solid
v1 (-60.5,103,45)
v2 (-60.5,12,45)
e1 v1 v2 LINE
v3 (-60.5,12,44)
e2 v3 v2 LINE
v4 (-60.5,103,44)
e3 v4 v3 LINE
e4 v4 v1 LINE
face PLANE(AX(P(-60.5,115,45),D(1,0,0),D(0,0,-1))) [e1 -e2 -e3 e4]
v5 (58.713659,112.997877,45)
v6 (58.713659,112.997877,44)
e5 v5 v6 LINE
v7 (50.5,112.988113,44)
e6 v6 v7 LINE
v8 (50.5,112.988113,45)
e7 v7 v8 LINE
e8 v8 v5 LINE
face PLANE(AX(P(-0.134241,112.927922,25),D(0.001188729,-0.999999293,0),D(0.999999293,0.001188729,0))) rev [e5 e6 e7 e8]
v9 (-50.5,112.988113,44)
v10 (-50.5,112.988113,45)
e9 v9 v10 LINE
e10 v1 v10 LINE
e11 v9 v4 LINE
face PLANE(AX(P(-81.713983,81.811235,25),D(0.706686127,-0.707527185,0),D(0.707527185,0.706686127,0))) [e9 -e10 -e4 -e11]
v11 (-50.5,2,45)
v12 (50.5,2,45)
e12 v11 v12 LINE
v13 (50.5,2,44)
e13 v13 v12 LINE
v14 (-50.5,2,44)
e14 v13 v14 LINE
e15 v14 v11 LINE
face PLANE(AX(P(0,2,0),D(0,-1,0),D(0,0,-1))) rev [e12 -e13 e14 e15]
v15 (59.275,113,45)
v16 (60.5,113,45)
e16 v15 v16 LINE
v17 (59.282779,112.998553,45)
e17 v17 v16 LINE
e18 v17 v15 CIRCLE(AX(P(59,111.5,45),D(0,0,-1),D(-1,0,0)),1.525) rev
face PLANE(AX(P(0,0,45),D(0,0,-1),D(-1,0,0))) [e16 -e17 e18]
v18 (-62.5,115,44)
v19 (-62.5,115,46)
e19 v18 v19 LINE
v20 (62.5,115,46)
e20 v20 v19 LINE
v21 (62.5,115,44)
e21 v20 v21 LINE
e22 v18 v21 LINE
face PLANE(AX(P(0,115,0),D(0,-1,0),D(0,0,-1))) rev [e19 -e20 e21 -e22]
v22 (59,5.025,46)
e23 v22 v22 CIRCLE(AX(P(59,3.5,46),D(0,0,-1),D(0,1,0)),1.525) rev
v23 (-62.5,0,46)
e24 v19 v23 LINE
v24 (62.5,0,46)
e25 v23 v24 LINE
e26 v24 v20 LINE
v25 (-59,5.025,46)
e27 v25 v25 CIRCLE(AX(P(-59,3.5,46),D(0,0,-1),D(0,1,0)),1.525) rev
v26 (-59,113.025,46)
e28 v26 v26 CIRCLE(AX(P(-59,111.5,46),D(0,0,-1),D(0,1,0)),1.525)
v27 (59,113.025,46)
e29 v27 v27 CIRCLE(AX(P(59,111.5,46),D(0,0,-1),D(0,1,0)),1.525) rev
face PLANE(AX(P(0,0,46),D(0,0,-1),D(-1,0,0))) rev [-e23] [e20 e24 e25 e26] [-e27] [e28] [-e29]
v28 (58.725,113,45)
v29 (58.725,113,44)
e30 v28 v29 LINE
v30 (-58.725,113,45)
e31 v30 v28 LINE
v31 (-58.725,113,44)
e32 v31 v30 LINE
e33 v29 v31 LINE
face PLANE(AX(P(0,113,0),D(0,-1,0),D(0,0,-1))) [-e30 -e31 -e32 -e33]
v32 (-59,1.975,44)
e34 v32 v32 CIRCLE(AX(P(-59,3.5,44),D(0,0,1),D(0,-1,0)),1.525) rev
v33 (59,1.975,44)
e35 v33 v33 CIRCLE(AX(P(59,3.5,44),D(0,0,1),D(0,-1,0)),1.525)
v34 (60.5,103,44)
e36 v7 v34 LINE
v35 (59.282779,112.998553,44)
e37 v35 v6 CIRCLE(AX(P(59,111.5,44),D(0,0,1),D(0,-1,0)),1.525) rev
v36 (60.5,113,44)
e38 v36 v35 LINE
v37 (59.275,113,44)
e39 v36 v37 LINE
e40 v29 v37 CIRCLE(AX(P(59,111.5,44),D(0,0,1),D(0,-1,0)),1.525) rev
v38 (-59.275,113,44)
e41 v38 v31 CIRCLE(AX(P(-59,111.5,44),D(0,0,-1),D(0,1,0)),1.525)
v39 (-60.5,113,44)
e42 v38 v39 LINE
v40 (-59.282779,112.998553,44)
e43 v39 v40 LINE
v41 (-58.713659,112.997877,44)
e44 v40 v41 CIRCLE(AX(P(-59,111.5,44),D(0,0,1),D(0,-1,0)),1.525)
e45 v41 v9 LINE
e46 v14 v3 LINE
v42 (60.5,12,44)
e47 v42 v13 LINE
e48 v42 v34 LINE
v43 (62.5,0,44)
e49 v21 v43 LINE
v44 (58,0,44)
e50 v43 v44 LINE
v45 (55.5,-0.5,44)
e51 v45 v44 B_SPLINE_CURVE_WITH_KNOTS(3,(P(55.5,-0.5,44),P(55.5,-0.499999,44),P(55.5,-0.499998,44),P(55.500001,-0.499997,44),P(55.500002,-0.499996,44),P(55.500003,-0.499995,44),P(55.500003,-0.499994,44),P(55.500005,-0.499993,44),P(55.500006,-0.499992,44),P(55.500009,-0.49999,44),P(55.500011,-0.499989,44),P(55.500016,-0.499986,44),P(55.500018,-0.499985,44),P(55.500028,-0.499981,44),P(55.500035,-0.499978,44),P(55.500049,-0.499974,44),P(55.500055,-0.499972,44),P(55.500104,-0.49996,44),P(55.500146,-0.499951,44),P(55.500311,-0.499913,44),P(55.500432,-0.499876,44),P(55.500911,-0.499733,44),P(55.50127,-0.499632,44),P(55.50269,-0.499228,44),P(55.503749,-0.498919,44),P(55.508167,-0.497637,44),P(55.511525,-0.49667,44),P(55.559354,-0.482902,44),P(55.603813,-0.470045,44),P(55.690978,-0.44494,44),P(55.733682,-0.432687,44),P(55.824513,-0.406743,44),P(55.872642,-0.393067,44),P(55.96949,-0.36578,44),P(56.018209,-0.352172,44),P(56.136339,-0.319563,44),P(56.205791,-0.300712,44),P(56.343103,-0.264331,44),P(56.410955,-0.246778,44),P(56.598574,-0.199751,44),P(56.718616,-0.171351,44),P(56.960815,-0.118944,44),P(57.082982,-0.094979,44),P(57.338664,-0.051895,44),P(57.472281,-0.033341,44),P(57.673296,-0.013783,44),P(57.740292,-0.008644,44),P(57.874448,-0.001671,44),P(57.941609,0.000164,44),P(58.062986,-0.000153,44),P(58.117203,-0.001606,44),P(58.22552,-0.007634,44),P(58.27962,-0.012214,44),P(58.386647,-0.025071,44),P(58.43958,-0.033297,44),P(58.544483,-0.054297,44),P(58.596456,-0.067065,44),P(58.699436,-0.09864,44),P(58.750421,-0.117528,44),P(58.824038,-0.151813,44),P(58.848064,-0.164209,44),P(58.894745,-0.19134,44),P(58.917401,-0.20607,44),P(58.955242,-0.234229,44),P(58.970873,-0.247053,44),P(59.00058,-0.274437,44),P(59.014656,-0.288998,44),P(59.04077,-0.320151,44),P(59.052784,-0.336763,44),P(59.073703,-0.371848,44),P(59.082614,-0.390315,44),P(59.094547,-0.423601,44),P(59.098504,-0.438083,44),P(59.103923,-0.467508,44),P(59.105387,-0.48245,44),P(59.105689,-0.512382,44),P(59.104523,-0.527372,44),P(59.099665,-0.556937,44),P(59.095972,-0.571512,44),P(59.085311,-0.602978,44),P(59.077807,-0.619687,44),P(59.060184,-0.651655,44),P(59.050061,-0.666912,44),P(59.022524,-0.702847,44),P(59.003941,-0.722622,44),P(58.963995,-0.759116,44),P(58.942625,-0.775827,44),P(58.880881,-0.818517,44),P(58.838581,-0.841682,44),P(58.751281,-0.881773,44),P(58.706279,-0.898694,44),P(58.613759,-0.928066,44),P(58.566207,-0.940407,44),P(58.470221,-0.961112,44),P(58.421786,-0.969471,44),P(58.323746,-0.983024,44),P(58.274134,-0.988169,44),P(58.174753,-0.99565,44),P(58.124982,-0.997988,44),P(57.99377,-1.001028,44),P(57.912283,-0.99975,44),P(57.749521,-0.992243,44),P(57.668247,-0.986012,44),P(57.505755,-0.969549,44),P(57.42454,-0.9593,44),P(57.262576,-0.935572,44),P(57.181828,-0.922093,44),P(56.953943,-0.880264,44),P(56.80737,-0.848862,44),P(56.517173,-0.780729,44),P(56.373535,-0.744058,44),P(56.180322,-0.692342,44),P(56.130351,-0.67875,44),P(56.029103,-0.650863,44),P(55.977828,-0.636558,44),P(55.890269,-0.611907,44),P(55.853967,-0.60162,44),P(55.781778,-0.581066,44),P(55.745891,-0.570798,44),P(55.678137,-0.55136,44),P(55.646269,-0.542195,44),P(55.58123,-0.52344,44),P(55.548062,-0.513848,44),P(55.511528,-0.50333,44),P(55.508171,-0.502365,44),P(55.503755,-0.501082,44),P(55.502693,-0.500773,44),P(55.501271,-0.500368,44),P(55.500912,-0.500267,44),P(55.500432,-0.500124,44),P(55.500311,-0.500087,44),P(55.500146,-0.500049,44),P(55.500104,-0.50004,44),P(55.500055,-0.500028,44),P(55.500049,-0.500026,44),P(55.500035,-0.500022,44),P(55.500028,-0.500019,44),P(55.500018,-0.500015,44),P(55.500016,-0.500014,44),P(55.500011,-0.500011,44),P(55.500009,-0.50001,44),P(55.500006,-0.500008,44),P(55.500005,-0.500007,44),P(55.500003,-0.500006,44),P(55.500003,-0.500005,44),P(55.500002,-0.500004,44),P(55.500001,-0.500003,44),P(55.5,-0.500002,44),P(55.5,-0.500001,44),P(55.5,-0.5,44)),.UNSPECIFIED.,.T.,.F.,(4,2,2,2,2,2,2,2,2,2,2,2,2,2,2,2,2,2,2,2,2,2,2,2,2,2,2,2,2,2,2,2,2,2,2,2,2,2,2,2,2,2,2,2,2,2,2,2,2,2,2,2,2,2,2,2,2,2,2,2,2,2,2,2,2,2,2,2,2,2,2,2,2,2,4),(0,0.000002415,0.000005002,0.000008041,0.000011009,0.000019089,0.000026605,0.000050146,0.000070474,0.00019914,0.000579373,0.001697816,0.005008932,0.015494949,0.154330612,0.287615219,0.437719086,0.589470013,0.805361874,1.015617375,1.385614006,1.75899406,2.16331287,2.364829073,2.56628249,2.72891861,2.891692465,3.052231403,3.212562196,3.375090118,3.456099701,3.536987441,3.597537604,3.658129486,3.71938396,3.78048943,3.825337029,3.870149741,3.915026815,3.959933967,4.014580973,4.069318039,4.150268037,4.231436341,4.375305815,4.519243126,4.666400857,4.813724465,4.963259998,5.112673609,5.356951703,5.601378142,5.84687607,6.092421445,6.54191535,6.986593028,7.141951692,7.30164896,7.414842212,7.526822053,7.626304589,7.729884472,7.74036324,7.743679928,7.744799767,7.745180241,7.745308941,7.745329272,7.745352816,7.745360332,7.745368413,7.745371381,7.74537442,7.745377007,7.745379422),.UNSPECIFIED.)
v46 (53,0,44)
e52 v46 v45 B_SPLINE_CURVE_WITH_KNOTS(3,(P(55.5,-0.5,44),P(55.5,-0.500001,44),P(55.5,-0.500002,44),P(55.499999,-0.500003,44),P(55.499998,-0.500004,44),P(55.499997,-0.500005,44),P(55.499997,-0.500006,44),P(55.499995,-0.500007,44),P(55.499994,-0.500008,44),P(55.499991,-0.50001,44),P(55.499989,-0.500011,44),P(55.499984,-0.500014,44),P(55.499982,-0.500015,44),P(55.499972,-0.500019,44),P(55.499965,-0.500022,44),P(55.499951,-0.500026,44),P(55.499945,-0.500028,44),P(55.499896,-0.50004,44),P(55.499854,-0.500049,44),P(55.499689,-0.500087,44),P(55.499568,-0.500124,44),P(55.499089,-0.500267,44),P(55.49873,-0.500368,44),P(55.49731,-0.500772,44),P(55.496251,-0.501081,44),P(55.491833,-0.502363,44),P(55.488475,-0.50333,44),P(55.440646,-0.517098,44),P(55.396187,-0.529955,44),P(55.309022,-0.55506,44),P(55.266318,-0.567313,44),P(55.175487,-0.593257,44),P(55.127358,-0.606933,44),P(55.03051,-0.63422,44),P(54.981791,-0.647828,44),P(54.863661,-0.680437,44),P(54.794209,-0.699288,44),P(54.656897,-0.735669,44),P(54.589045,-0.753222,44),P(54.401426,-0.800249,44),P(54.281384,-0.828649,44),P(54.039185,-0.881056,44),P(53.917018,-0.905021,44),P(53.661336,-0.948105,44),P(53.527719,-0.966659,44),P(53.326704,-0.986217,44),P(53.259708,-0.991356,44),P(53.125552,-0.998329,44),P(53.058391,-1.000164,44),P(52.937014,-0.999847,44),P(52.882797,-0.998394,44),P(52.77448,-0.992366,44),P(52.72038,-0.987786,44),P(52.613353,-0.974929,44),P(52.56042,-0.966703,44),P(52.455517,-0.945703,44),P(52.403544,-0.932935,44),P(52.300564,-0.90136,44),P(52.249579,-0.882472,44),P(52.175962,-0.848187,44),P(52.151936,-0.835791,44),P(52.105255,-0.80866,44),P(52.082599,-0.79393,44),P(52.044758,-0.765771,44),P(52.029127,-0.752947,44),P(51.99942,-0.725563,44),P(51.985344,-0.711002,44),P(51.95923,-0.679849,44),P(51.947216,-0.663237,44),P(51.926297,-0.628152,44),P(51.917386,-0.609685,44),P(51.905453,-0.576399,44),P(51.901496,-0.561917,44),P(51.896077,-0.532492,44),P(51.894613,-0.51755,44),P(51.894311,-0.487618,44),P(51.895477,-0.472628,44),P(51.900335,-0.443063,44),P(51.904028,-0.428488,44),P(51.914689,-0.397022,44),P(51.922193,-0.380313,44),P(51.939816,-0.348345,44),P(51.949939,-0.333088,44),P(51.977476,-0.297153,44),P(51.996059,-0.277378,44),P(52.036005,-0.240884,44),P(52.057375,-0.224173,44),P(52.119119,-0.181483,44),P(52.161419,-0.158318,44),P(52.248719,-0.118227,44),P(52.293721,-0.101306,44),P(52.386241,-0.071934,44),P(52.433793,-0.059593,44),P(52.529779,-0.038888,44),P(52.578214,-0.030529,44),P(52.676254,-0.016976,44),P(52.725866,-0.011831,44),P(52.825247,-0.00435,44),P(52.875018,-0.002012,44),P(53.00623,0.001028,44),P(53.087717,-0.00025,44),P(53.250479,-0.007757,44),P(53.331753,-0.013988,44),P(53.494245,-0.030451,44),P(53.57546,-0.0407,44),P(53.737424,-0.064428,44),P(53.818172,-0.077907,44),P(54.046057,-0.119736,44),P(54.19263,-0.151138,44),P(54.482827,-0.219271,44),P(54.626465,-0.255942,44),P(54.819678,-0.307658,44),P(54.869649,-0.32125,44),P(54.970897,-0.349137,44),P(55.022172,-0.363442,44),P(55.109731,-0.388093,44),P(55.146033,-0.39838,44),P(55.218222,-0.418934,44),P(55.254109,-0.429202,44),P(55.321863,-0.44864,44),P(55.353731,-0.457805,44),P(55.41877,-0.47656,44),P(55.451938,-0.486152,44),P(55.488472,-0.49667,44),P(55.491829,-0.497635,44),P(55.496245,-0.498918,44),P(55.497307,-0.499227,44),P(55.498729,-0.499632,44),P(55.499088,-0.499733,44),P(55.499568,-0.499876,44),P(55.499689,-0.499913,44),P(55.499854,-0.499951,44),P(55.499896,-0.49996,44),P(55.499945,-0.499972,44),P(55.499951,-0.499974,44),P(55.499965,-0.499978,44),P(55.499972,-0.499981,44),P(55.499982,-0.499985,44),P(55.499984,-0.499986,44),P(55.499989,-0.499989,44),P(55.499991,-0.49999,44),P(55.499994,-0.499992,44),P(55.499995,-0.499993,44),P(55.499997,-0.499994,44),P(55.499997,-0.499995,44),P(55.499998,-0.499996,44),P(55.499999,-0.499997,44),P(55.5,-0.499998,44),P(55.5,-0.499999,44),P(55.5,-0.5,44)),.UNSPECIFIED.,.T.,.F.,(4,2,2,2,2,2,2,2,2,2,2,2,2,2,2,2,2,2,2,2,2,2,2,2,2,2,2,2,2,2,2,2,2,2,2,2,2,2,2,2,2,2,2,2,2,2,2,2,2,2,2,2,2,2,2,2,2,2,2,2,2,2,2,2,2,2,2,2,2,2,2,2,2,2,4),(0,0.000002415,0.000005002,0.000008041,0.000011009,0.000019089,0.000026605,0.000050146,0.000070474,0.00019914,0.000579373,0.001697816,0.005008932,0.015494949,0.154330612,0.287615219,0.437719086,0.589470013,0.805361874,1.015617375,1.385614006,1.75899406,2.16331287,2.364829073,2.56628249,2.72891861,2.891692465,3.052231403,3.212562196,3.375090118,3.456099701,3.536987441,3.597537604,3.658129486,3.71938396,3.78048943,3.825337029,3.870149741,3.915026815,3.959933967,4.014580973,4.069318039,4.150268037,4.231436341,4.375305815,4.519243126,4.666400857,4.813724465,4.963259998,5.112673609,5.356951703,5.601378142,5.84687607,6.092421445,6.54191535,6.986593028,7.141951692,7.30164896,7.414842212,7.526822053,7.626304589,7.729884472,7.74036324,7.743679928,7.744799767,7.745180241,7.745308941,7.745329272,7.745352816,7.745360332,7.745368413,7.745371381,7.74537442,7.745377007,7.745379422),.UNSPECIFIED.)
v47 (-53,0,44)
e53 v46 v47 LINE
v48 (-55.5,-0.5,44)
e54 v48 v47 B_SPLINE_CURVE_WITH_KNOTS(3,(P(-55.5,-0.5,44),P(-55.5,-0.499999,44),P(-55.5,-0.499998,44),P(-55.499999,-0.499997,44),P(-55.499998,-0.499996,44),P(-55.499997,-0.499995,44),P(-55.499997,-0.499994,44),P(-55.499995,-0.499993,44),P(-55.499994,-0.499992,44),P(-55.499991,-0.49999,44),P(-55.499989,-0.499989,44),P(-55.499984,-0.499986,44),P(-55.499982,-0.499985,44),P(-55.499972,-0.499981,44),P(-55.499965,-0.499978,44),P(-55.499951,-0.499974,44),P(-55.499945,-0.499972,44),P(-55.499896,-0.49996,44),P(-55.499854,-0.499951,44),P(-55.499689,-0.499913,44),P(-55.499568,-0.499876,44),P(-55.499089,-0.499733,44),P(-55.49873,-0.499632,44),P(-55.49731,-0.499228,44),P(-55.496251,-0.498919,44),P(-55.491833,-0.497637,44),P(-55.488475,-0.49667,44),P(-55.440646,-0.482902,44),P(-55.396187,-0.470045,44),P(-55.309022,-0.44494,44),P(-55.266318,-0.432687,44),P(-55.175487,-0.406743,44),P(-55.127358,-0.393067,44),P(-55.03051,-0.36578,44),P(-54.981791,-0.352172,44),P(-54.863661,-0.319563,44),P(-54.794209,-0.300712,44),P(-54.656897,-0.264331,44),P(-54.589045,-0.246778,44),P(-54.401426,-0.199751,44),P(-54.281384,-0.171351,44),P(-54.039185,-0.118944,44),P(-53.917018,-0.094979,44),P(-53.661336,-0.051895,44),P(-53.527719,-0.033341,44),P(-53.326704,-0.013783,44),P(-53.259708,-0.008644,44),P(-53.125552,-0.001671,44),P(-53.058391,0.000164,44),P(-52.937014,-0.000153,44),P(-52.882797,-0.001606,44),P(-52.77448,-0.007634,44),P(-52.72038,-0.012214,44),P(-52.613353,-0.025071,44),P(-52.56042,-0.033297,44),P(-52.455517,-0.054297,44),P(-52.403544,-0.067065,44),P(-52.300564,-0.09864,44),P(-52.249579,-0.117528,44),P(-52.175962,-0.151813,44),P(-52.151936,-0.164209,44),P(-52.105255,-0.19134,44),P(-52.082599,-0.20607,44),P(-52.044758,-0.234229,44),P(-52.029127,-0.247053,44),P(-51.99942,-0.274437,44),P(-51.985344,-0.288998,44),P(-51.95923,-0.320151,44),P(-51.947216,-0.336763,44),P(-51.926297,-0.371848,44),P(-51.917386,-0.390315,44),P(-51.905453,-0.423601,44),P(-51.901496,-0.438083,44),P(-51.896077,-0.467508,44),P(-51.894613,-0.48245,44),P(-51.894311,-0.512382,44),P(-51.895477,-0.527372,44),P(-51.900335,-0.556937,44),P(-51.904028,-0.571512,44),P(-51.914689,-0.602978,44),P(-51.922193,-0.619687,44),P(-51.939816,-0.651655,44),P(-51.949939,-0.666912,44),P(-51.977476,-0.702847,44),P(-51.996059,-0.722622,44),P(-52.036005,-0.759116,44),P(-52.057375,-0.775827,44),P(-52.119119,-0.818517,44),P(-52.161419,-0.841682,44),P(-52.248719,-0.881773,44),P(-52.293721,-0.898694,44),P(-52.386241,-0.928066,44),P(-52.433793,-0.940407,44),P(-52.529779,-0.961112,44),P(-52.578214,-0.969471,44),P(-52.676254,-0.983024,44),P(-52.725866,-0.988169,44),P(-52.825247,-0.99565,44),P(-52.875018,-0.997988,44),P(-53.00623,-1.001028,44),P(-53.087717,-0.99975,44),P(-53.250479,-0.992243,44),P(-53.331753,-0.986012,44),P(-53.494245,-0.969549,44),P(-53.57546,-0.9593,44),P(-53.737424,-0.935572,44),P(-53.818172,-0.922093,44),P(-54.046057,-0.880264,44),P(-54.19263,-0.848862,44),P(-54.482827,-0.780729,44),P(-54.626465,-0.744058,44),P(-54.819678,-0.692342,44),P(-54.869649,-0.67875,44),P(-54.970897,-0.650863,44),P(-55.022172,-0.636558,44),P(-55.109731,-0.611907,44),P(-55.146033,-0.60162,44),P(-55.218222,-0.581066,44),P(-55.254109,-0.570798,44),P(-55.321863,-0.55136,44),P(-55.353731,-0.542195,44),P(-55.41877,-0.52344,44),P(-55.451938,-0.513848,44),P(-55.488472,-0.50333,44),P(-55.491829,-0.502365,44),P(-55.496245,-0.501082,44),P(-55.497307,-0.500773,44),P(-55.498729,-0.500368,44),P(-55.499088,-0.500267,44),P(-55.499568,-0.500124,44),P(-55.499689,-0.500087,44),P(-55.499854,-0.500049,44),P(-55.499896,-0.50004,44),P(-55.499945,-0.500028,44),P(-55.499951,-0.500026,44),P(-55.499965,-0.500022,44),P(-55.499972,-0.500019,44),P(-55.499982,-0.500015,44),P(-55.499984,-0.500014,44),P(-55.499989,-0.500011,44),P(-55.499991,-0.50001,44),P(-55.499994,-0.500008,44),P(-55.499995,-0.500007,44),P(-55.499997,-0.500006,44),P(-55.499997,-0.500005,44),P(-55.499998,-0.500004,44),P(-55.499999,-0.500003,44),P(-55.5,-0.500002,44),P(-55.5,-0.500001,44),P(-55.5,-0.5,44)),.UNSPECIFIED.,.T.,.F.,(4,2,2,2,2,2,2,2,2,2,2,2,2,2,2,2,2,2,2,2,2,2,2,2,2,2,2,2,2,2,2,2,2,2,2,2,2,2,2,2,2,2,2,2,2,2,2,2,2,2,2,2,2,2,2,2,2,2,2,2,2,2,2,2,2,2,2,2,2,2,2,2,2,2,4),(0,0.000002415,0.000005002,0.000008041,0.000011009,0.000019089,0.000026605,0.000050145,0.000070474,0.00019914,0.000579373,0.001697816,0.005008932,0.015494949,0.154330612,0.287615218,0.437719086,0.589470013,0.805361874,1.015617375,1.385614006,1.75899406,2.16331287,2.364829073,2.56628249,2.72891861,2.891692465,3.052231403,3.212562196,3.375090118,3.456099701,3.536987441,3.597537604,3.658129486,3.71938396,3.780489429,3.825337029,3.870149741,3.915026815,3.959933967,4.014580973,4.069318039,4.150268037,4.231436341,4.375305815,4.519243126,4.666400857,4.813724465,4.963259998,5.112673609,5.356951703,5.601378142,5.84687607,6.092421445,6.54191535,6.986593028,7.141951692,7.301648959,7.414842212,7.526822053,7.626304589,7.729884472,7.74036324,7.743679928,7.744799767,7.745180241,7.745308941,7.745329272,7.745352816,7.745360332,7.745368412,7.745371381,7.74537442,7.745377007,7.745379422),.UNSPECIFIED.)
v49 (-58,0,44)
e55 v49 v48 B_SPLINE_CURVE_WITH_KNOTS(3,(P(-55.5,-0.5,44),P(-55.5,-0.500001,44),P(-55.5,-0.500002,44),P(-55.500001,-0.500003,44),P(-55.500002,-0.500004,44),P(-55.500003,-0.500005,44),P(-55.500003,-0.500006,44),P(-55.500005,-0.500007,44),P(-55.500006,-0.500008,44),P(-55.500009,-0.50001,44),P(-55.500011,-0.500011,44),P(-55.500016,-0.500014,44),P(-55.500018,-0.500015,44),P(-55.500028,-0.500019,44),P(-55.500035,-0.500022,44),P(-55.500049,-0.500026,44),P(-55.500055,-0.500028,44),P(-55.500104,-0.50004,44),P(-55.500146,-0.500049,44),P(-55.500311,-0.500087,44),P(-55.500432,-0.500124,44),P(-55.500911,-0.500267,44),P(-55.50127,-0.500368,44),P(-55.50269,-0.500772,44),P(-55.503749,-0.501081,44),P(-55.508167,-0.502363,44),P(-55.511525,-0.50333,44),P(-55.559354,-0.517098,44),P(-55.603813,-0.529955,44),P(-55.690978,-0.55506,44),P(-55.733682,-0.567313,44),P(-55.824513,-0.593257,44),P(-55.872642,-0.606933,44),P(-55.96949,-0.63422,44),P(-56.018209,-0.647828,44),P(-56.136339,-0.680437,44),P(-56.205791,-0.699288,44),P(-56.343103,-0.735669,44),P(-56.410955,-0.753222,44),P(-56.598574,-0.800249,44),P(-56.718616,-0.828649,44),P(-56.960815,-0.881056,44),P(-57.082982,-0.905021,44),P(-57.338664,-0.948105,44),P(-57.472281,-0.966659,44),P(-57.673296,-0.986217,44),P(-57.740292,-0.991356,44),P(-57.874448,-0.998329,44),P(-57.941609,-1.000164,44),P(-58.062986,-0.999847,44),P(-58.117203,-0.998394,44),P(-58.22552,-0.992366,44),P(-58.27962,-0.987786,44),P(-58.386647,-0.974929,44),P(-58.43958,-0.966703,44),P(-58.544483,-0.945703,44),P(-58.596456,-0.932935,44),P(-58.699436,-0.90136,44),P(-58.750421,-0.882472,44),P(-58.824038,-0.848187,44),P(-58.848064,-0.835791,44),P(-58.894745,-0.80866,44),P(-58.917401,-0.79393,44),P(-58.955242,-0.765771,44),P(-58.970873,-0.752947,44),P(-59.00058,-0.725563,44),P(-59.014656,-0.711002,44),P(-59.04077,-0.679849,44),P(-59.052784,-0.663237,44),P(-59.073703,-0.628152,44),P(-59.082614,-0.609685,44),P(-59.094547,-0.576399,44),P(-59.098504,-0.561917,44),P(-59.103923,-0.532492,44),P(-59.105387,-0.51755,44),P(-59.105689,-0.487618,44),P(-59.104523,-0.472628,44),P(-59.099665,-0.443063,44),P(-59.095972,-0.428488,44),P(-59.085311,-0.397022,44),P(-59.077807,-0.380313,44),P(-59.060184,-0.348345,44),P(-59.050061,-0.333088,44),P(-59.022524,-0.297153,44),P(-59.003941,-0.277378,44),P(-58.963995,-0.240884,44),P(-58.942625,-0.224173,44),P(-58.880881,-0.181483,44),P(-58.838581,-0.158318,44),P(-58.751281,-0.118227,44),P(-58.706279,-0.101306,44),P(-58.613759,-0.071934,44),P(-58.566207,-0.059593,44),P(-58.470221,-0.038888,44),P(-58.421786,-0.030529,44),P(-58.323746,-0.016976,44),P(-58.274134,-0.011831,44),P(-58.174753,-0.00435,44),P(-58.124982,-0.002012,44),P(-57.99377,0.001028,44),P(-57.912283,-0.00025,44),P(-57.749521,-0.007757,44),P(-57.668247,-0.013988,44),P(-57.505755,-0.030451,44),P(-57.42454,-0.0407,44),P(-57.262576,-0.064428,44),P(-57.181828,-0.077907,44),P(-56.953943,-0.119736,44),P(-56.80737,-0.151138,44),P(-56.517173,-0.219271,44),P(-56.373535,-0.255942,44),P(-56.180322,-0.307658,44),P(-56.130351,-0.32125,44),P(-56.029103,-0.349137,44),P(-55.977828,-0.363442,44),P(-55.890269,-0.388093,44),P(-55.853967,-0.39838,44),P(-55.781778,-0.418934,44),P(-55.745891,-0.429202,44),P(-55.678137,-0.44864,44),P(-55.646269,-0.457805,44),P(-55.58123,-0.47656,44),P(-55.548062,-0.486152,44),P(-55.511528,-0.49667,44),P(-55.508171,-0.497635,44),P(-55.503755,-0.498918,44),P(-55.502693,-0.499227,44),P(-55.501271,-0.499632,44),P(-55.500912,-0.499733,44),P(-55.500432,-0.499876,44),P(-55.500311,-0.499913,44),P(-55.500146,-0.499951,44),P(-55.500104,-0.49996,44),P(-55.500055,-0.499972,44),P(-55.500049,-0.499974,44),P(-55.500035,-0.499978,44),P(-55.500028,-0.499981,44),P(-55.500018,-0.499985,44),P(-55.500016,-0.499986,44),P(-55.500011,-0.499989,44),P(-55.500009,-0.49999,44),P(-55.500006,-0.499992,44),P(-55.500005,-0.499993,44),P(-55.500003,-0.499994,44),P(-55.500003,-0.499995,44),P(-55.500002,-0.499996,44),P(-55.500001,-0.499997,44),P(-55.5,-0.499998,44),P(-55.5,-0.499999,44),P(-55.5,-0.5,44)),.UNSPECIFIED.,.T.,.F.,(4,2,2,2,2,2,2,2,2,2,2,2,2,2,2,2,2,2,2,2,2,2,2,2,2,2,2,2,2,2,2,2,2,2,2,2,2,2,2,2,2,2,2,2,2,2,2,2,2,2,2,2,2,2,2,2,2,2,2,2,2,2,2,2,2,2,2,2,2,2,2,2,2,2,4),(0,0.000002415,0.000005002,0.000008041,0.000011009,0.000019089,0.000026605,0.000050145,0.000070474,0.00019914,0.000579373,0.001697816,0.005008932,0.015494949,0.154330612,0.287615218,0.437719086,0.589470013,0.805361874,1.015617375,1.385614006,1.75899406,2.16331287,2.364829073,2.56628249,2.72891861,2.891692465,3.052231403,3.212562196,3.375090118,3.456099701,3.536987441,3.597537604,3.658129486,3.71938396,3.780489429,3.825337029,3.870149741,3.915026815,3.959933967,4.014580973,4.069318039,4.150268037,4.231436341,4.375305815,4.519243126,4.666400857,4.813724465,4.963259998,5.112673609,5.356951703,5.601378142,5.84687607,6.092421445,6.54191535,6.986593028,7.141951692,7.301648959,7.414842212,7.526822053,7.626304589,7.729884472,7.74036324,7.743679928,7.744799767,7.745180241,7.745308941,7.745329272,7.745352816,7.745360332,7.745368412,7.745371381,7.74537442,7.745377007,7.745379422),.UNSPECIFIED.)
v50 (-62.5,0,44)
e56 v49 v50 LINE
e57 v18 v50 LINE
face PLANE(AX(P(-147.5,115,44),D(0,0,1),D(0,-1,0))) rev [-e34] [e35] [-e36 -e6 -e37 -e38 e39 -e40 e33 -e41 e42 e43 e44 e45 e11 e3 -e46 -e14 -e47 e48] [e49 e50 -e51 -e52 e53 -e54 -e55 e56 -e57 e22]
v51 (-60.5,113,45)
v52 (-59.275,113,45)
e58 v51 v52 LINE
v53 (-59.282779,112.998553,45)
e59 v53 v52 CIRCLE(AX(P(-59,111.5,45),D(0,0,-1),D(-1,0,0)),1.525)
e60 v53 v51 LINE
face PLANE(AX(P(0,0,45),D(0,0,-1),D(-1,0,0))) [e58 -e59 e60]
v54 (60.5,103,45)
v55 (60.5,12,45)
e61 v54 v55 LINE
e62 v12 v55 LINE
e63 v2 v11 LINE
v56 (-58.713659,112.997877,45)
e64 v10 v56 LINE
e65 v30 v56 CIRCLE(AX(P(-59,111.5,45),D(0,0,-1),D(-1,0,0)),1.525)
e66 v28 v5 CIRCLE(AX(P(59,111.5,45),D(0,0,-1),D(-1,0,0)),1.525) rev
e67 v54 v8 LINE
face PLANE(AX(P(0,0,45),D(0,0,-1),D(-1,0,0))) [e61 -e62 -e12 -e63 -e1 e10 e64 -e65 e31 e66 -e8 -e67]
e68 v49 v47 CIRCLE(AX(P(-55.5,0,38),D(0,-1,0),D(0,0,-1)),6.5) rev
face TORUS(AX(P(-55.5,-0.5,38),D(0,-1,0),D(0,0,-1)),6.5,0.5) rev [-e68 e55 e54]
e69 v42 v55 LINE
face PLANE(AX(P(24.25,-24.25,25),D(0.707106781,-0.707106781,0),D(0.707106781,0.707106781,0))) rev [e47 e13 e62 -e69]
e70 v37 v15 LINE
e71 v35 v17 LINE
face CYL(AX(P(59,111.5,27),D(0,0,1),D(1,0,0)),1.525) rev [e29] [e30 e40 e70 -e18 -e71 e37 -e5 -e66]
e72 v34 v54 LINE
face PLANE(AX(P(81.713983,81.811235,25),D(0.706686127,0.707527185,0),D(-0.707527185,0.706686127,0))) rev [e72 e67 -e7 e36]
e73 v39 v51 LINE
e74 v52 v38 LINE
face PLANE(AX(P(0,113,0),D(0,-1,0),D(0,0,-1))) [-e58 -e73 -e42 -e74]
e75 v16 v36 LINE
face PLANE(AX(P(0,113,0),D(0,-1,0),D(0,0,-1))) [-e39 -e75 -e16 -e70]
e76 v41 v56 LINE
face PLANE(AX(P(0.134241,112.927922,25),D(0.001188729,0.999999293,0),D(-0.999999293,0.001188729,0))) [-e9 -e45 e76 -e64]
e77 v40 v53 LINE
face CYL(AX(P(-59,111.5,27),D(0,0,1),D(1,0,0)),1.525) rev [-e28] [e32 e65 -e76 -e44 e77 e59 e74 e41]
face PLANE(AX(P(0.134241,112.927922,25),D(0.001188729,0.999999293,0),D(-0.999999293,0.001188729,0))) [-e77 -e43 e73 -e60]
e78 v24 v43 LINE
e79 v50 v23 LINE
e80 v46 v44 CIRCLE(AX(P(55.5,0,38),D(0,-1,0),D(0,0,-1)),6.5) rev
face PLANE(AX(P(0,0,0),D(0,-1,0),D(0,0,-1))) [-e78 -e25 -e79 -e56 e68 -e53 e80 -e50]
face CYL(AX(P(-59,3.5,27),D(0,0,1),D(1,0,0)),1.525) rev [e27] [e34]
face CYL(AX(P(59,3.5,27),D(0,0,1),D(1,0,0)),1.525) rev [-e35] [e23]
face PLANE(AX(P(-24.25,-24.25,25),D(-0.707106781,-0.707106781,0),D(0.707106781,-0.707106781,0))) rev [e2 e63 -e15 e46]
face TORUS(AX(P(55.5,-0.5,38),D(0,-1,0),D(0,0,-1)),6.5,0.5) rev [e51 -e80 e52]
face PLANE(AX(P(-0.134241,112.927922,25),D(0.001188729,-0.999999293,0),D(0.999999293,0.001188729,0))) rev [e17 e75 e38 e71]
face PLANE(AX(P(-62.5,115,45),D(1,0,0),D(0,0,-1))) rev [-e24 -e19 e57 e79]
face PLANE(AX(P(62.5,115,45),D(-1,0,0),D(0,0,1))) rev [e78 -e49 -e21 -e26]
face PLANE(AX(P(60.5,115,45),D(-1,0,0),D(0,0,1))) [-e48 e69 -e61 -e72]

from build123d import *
from OCP.BRepFilletAPI import BRepFilletAPI_MakeChamfer

# Parameters (mm, degrees)
SKETCH1_W            = 125
SKETCH1_H            = 90
BOSS_EXTRUDE1_DEPTH  = 115
SHELL1_T             = -2
SKETCH4_W            = 67.8
SKETCH4_H            = 16.7
CUT_EXTRUDE1_DEPTH   = 1
SKETCH5_R            = 3.25
CUT_EXTRUDE2_DEPTH   = 37
SKETCH6_W            = 1
SKETCH6_H            = 111
BOSS_EXTRUDE2_DEPTH  = 10
FILLET1_SIZE         = 4
FILLET1_SIZE_2       = 10
FILLET2_R            = 1
SKETCH7_R            = 13
CUT_EXTRUDE3_DEPTH   = 10
SKETCH8_W            = 24
SKETCH8_H            = 49.041471127
BOSS_EXTRUDE3_DEPTH  = 12
CHAMFER1_SIZE        = 10
CHAMFER1_SIZE2       = 11.917535926
CUT_EXTRUDE4_DEPTH   = 40
SKETCH10_R           = 1.4
BOSS_EXTRUDE4_DEPTH  = 10
FILLET3_R            = 1
SKETCH11_R           = 3.25
CUT_EXTRUDE5_DEPTH   = 161
SKETCH13_R           = 5.75
CUT_EXTRUDE6_DEPTH   = 161
SKETCH14_R           = 6
SKETCH14_R_2         = 5.5
BOSS_EXTRUDE5_DEPTH  = 1
FILLET4_R            = 0.5
FILLET5_R            = 0.5
CUT_EXTRUDE7_DEPTH   = 9
BOSS_EXTRUDE6_DEPTH  = 20
CHAMFER2_SIZE        = 10
CHAMFER2_SIZE2       = 9.656887748
CHAMFER3_SIZE        = 5
CHAMFER3_SIZE2       = 9.813052528
SKETCH19_R           = 1.525
CUT_EXTRUDE8_DEPTH   = 18
SKETCH23_W           = 103.271757447
SKETCH23_H           = 129.791226308
CUT_EXTRUDE9_DEPTH   = 210
SKETCH24_W           = 125
SKETCH24_H           = 115
BOSS_EXTRUDE10_DEPTH = 1
CUT_EXTRUDE10_START  = -2
SKETCH25_R           = 1.525
CUT_EXTRUDE10_DEPTH  = 2


# Some blends are built 0.0001 mm under size
with BuildPart() as part:
    # Sketch1 → Boss-Extrude1 (new body)
    with BuildSketch(Plane(origin=(0, 0, 0), x_dir=(1, 0, 0), z_dir=(0, 1, 0))):
        Rectangle(SKETCH1_W, SKETCH1_H)
    extrude(amount=BOSS_EXTRUDE1_DEPTH)

    # Shell1
    shell1_openings = [part.faces().sort_by_distance(p)[0] for p in [
        (0, 57.5, 45),
    ]]
    offset(amount=SHELL1_T, openings=shell1_openings, kind=Kind.INTERSECTION)

    # Sketch4 → Cut-Extrude1 (cut)
    with BuildSketch(Plane.XZ.offset(-113)):
        with Locations((-26.6, -34.65)):
            Rectangle(SKETCH4_W, SKETCH4_H)
    extrude(amount=-CUT_EXTRUDE1_DEPTH, mode=Mode.SUBTRACT)

    # Sketch5 → Cut-Extrude2 (cut)
    with BuildSketch(Plane.XZ.offset(-114)):
        with Locations(Location((-50.5, -34.65, 0), (0, 0, 270))):
            Circle(SKETCH5_R)
    extrude(amount=-CUT_EXTRUDE2_DEPTH, mode=Mode.SUBTRACT)

    # Sketch6 → Boss-Extrude2 (add)
    with BuildSketch(Plane.XY.offset(-43)):
        with Locations((7.8, 57.5)):
            Rectangle(SKETCH6_W, SKETCH6_H)
    extrude(amount=BOSS_EXTRUDE2_DEPTH)

    # Fillet1
    # a fillet whose section is not a circle: 10, 4 mm, written as the material it adds along each edge
    with BuildSketch(Plane(origin=(8.3, 2, -43), x_dir=(1, 0, 0), z_dir=(0, 1, 0))) as fillet1_piece_1:
        with BuildLine():
            Bezier((FILLET1_SIZE, 0), (0, 0), (0, -FILLET1_SIZE_2), weights=[1, 0.707106781, 1])
            Line((0, -FILLET1_SIZE_2), (0, 0))
            Line((0, 0), (FILLET1_SIZE, 0))
        make_face()
    extrude(amount=111)

    # Fillet2
    fillet2_edges = [part.edges().sort_by_distance(p)[0] for p in [
        (8.3, 57.5, -33),
    ]]
    fillet(fillet2_edges, radius=FILLET2_R)

    # Sketch7 → Cut-Extrude3 (cut)
    with BuildSketch(Plane(origin=(62.5, 0, 0), x_dir=(0, 0, -1), z_dir=(1, 0, 0))):
        with Locations((0, 35)):
            Circle(SKETCH7_R)
    extrude(amount=-CUT_EXTRUDE3_DEPTH, mode=Mode.SUBTRACT)

    # Sketch8 → Boss-Extrude3 (add)
    with BuildSketch(Plane.ZY.offset(62.5)):
        with Locations((15, 90.479264437)):
            Rectangle(SKETCH8_W, SKETCH8_H)
    extrude(amount=BOSS_EXTRUDE3_DEPTH)

    # Chamfer1
    chamfer1_edges = [part.edges().sort_by_distance(p)[0] for p in [
        (-62.5, 90.479264436, 3),
    ]]
    chamfer1_side = [part.faces().sort_by_distance(p)[0] for p in [
        (-62.5, 53.268405144, -1.924661569),
    ]]
    chamfer(chamfer1_edges, length=CHAMFER1_SIZE, length2=CHAMFER1_SIZE2, reference=chamfer1_side[0])

    # Sketch9 → Cut-Extrude4 (cut)
    with BuildSketch(Plane(origin=(0, 115, 0), x_dir=(1, 0, 0), z_dir=(0, 1, 0))):
        Polygon((-64.139712889, -5), (-72.5, -5), (-72.5, -21.393203559), (-72.5, -25), (-64.139712889, -25), align=None)
    extrude(amount=-CUT_EXTRUDE4_DEPTH, mode=Mode.SUBTRACT)

    # Sketch10 → Boss-Extrude4 (add)
    with BuildSketch(Plane.XY.offset(-43)):
        with Locations((22.3, 78.5)):
            Circle(SKETCH10_R)
        with Locations(Location((51.3, 78.5, 0), (0, 0, 180))):
            Circle(SKETCH10_R)
        with Locations((51.3, 105)):
            Circle(SKETCH10_R)
        with Locations(Location((22.3, 105, 0), (0, 0, 180))):
            Circle(SKETCH10_R)
    extrude(amount=BOSS_EXTRUDE4_DEPTH)

    # Fillet3
    fillet3_edges = [part.edges().sort_by_distance(p)[0] for p in [
        (23.7, 105, -43),
        (49.9, 105, -43),
        (52.7, 78.5, -43),
        (20.9, 78.5, -43),
    ]]
    fillet(fillet3_edges, radius=FILLET3_R)

    # Sketch11 → Cut-Extrude5 (cut)
    with BuildSketch(Plane.XZ.offset(-113)):
        with Locations(Location((42.3, -38.5, 0), (0, 0, 270))):
            Circle(SKETCH11_R)
    extrude(amount=-CUT_EXTRUDE5_DEPTH, mode=Mode.SUBTRACT)

    # Sketch13 → Cut-Extrude6 (cut)
    with BuildSketch(Plane(origin=(-60.5, 0, 0), x_dir=(0, 0, -1), z_dir=(1, 0, 0))):
        with Locations((18, 25)):
            Circle(SKETCH13_R)
    extrude(amount=-CUT_EXTRUDE6_DEPTH, mode=Mode.SUBTRACT)

    # Sketch14 → Boss-Extrude5 (add)
    # profile 1 of 4: a face of its own
    with BuildSketch(Plane.XZ):
        with Locations(Location((-55.5, 38, 0), (0, 0, 270))):
            Circle(SKETCH14_R)
        with Locations(Location((-55.5, 38, 0), (0, 0, 270))):
            Circle(SKETCH14_R_2, mode=Mode.SUBTRACT)
    # profile 2 of 4: a face of its own
    with BuildSketch(Plane.XZ):
        with Locations(Location((55.5, 38, 0), (0, 0, 270))):
            Circle(SKETCH14_R)
        with Locations(Location((55.5, 38, 0), (0, 0, 270))):
            Circle(SKETCH14_R_2, mode=Mode.SUBTRACT)
    # profile 3 of 4: a face of its own
    with BuildSketch(Plane.XZ):
        with Locations(Location((55.5, -38, 0), (0, 0, 270))):
            Circle(SKETCH14_R)
        with Locations(Location((55.5, -38, 0), (0, 0, 270))):
            Circle(SKETCH14_R_2, mode=Mode.SUBTRACT)
    # profile 4 of 4: a face of its own
    with BuildSketch(Plane.XZ):
        with Locations(Location((-55.5, -38, 0), (0, 0, 270))):
            Circle(SKETCH14_R)
    extrude(amount=BOSS_EXTRUDE5_DEPTH)

    # Fillet4
    fillet4_edges = [part.edges().sort_by_distance(p)[0] for p in [
        (-55.5, -1, 44),
        (-55.5, 0, 44),
    ]]
    fillet(fillet4_edges, radius=FILLET4_R - 0.0001)  # a hair under: the kernel refuses the full size

    # Fillet5
    fillet5_edges = [part.edges().sort_by_distance(p)[0] for p in [
        (55.5, 0, -32),
        (55.5, -1, -32),
        (55.5, 0, 44),
        (55.5, -1, 44),
        (-55.5, 0, -32),
        (-55.5, -1, -32),
    ]]
    fillet(fillet5_edges, radius=FILLET5_R - 0.0001)  # a hair under: the kernel refuses the full size

    # Sketch17 → Cut-Extrude7 (cut)
    with BuildSketch(Plane(origin=(0, 115, 0), x_dir=(1, 0, 0), z_dir=(0, 1, 0))):
        with BuildLine():
            ThreePointArc((25, -35), (20.732233047, -33.232233047), (22.5, -37.5))
            Line((22.5, -37.5), (22.5, -35))
            Line((22.5, -35), (25, -35))
        make_face()
        with BuildLine():
            Line((22.5, -35), (22.5, -37.5))
            ThreePointArc((22.5, -37.5), (24.267766953, -36.767766953), (25, -35))
            Line((25, -35), (22.5, -35))
        make_face()
        with BuildLine():
            ThreePointArc((32, -35), (29.5, -32.5), (27, -35))
            Line((27, -35), (32, -35))
        make_face()
        with BuildLine():
            Line((32, -35), (27, -35))
            ThreePointArc((27, -35), (29.5, -37.5), (32, -35))
        make_face()
        with BuildLine():
            ThreePointArc((39, -35), (36.5, -32.5), (34, -35))
            Line((34, -35), (39, -35))
        make_face()
        with BuildLine():
            Line((39, -35), (34, -35))
            ThreePointArc((34, -35), (36.5, -37.5), (39, -35))
        make_face()
        with BuildLine():
            ThreePointArc((46, -35), (43.5, -32.5), (41, -35))
            Line((41, -35), (46, -35))
        make_face()
        with BuildLine():
            Line((46, -35), (41, -35))
            ThreePointArc((41, -35), (43.5, -37.5), (46, -35))
        make_face()
    extrude(amount=-CUT_EXTRUDE7_DEPTH, mode=Mode.SUBTRACT)

    # Sketch18 → Boss-Extrude6 (add)
    with BuildSketch(Plane.XY.offset(45)):
        Polygon((-50.5, 2), (-60.5, 12), (-60.5, 2), align=None)
        Polygon((-60.5, 113), (-60.5, 103), (-50.5, 112.988112704), align=None)
        Polygon((50.5, 112.988112704), (60.5, 103), (60.5, 113), align=None)
        Polygon((60.5, 12), (50.5, 2), (60.5, 2), align=None)
    extrude(amount=-BOSS_EXTRUDE6_DEPTH)

    # Chamfer2
    chamfer2_edges = [part.edges().sort_by_distance(p)[0] for p in [
        (-55.5, 2, 25),
        (55.5, 2, 25),
    ]]
    chamfer2_side = [part.faces().sort_by_distance(p)[0] for p in [
        (-0.015179925, 2, -0.25697617),
    ]]
    chamfer(chamfer2_edges, length=CHAMFER2_SIZE, length2=CHAMFER2_SIZE2, reference=chamfer2_side[0])

    # Chamfer3: one chamfer whose edges measure the first distance from different faces: ONE call of the kernel's chamfer builder (chamfer() names one face for all edges)
    chamfer3_edges_1 = [part.edges().sort_by_distance(p)[0] for p in [
        (-60.5, 108, 25),
    ]]
    chamfer3_side_1 = [part.faces().sort_by_distance(p)[0] for p in [
        (-60.5, 58.240348279, -0.431861074),
    ]]
    chamfer3_edges_2 = [part.edges().sort_by_distance(p)[0] for p in [
        (60.5, 108, 25),
    ]]
    chamfer3_side_2 = [part.faces().sort_by_distance(p)[0] for p in [
        (60.5, 59.1464465, -0.600556504),
    ]]
    chamfer3 = BRepFilletAPI_MakeChamfer(part.part.solid().wrapped)
    for e in chamfer3_edges_1:
        chamfer3.Add(CHAMFER3_SIZE, CHAMFER3_SIZE2, e.wrapped, chamfer3_side_1[0].wrapped)  # the first distance lies on this face
    for e in chamfer3_edges_2:
        chamfer3.Add(CHAMFER3_SIZE, CHAMFER3_SIZE2, e.wrapped, chamfer3_side_2[0].wrapped)  # the first distance lies on this face
    add(Compound.cast(chamfer3.Shape()), mode=Mode.REPLACE)

    # Sketch19 → Cut-Extrude8 (cut)
    with BuildSketch(Plane.XY.offset(45)):
        with Locations((-59, 3.5)):
            Circle(SKETCH19_R)
        with BuildLine():
            ThreePointArc((-59.282778619, 112.998553053), (-59.001812811, 109.975001077), (-58.713659436, 112.997876524))
            Line((-58.713659436, 112.997876524), (-59.282778619, 112.998553053))
        make_face()
        with BuildLine():
            Line((59.282778619, 112.998553053), (58.713659436, 112.997876524))
            ThreePointArc((58.713659436, 112.997876524), (59.001812811, 109.975001077), (59.282778619, 112.998553053))
        make_face()
        with BuildLine():
            ThreePointArc((59.275, 113), (59, 113.025), (58.725, 113))
            Line((58.725, 113), (59.275, 113))
        make_face()
        with Locations((59, 3.5)):
            Circle(SKETCH19_R)
    extrude(amount=-CUT_EXTRUDE8_DEPTH, mode=Mode.SUBTRACT)

    # Sketch23 → Cut-Extrude9 (cut)
    with BuildSketch(Plane(origin=(62.5, 0, 0), x_dir=(0, 0, -1), z_dir=(1, 0, 0))):
        with Locations((7.635878724, 50.104386846)):
            Rectangle(SKETCH23_W, SKETCH23_H)
    extrude(amount=-CUT_EXTRUDE9_DEPTH, mode=Mode.SUBTRACT)

    # Sketch24 → Boss-Extrude10 (add)
    with BuildSketch(Plane.XY.offset(45)):
        with Locations((0, 57.5)):
            Rectangle(SKETCH24_W, SKETCH24_H)
    extrude(amount=BOSS_EXTRUDE10_DEPTH)

    # Sketch25 → Cut-Extrude10 (cut)
    with BuildSketch(Plane(origin=(0, 0, 44), x_dir=(-1, 0, 0), z_dir=(0, 0, -1)).offset(CUT_EXTRUDE10_START)):
        with BuildLine():
            ThreePointArc((-59.282778619, 112.998553053), (-59.973238821, 110.325933904), (-57.475, 111.5))
            ThreePointArc((-57.475, 111.5), (-57.824777817, 112.471842487), (-58.713659436, 112.997876524))
            ThreePointArc((-58.713659436, 112.997876524), (-58.71932771, 112.998948987), (-58.725, 113))
            ThreePointArc((-58.725, 113), (-59, 113.025), (-59.275, 113))
            ThreePointArc((-59.275, 113), (-59.278890248, 112.999281571), (-59.282778619, 112.998553053))
        make_face()
        with Locations(Location((-59, 3.5, 0), (0, 0, 270))):
            Circle(SKETCH25_R)
        with Locations(Location((59, 3.5, 0), (0, 0, 270))):
            Circle(SKETCH25_R)
        with Locations(Location((59, 111.5, 0), (0, 0, 100.822340204))):
            Circle(SKETCH25_R)
    extrude(amount=CUT_EXTRUDE10_DEPTH, mode=Mode.SUBTRACT)


solid = part.part
